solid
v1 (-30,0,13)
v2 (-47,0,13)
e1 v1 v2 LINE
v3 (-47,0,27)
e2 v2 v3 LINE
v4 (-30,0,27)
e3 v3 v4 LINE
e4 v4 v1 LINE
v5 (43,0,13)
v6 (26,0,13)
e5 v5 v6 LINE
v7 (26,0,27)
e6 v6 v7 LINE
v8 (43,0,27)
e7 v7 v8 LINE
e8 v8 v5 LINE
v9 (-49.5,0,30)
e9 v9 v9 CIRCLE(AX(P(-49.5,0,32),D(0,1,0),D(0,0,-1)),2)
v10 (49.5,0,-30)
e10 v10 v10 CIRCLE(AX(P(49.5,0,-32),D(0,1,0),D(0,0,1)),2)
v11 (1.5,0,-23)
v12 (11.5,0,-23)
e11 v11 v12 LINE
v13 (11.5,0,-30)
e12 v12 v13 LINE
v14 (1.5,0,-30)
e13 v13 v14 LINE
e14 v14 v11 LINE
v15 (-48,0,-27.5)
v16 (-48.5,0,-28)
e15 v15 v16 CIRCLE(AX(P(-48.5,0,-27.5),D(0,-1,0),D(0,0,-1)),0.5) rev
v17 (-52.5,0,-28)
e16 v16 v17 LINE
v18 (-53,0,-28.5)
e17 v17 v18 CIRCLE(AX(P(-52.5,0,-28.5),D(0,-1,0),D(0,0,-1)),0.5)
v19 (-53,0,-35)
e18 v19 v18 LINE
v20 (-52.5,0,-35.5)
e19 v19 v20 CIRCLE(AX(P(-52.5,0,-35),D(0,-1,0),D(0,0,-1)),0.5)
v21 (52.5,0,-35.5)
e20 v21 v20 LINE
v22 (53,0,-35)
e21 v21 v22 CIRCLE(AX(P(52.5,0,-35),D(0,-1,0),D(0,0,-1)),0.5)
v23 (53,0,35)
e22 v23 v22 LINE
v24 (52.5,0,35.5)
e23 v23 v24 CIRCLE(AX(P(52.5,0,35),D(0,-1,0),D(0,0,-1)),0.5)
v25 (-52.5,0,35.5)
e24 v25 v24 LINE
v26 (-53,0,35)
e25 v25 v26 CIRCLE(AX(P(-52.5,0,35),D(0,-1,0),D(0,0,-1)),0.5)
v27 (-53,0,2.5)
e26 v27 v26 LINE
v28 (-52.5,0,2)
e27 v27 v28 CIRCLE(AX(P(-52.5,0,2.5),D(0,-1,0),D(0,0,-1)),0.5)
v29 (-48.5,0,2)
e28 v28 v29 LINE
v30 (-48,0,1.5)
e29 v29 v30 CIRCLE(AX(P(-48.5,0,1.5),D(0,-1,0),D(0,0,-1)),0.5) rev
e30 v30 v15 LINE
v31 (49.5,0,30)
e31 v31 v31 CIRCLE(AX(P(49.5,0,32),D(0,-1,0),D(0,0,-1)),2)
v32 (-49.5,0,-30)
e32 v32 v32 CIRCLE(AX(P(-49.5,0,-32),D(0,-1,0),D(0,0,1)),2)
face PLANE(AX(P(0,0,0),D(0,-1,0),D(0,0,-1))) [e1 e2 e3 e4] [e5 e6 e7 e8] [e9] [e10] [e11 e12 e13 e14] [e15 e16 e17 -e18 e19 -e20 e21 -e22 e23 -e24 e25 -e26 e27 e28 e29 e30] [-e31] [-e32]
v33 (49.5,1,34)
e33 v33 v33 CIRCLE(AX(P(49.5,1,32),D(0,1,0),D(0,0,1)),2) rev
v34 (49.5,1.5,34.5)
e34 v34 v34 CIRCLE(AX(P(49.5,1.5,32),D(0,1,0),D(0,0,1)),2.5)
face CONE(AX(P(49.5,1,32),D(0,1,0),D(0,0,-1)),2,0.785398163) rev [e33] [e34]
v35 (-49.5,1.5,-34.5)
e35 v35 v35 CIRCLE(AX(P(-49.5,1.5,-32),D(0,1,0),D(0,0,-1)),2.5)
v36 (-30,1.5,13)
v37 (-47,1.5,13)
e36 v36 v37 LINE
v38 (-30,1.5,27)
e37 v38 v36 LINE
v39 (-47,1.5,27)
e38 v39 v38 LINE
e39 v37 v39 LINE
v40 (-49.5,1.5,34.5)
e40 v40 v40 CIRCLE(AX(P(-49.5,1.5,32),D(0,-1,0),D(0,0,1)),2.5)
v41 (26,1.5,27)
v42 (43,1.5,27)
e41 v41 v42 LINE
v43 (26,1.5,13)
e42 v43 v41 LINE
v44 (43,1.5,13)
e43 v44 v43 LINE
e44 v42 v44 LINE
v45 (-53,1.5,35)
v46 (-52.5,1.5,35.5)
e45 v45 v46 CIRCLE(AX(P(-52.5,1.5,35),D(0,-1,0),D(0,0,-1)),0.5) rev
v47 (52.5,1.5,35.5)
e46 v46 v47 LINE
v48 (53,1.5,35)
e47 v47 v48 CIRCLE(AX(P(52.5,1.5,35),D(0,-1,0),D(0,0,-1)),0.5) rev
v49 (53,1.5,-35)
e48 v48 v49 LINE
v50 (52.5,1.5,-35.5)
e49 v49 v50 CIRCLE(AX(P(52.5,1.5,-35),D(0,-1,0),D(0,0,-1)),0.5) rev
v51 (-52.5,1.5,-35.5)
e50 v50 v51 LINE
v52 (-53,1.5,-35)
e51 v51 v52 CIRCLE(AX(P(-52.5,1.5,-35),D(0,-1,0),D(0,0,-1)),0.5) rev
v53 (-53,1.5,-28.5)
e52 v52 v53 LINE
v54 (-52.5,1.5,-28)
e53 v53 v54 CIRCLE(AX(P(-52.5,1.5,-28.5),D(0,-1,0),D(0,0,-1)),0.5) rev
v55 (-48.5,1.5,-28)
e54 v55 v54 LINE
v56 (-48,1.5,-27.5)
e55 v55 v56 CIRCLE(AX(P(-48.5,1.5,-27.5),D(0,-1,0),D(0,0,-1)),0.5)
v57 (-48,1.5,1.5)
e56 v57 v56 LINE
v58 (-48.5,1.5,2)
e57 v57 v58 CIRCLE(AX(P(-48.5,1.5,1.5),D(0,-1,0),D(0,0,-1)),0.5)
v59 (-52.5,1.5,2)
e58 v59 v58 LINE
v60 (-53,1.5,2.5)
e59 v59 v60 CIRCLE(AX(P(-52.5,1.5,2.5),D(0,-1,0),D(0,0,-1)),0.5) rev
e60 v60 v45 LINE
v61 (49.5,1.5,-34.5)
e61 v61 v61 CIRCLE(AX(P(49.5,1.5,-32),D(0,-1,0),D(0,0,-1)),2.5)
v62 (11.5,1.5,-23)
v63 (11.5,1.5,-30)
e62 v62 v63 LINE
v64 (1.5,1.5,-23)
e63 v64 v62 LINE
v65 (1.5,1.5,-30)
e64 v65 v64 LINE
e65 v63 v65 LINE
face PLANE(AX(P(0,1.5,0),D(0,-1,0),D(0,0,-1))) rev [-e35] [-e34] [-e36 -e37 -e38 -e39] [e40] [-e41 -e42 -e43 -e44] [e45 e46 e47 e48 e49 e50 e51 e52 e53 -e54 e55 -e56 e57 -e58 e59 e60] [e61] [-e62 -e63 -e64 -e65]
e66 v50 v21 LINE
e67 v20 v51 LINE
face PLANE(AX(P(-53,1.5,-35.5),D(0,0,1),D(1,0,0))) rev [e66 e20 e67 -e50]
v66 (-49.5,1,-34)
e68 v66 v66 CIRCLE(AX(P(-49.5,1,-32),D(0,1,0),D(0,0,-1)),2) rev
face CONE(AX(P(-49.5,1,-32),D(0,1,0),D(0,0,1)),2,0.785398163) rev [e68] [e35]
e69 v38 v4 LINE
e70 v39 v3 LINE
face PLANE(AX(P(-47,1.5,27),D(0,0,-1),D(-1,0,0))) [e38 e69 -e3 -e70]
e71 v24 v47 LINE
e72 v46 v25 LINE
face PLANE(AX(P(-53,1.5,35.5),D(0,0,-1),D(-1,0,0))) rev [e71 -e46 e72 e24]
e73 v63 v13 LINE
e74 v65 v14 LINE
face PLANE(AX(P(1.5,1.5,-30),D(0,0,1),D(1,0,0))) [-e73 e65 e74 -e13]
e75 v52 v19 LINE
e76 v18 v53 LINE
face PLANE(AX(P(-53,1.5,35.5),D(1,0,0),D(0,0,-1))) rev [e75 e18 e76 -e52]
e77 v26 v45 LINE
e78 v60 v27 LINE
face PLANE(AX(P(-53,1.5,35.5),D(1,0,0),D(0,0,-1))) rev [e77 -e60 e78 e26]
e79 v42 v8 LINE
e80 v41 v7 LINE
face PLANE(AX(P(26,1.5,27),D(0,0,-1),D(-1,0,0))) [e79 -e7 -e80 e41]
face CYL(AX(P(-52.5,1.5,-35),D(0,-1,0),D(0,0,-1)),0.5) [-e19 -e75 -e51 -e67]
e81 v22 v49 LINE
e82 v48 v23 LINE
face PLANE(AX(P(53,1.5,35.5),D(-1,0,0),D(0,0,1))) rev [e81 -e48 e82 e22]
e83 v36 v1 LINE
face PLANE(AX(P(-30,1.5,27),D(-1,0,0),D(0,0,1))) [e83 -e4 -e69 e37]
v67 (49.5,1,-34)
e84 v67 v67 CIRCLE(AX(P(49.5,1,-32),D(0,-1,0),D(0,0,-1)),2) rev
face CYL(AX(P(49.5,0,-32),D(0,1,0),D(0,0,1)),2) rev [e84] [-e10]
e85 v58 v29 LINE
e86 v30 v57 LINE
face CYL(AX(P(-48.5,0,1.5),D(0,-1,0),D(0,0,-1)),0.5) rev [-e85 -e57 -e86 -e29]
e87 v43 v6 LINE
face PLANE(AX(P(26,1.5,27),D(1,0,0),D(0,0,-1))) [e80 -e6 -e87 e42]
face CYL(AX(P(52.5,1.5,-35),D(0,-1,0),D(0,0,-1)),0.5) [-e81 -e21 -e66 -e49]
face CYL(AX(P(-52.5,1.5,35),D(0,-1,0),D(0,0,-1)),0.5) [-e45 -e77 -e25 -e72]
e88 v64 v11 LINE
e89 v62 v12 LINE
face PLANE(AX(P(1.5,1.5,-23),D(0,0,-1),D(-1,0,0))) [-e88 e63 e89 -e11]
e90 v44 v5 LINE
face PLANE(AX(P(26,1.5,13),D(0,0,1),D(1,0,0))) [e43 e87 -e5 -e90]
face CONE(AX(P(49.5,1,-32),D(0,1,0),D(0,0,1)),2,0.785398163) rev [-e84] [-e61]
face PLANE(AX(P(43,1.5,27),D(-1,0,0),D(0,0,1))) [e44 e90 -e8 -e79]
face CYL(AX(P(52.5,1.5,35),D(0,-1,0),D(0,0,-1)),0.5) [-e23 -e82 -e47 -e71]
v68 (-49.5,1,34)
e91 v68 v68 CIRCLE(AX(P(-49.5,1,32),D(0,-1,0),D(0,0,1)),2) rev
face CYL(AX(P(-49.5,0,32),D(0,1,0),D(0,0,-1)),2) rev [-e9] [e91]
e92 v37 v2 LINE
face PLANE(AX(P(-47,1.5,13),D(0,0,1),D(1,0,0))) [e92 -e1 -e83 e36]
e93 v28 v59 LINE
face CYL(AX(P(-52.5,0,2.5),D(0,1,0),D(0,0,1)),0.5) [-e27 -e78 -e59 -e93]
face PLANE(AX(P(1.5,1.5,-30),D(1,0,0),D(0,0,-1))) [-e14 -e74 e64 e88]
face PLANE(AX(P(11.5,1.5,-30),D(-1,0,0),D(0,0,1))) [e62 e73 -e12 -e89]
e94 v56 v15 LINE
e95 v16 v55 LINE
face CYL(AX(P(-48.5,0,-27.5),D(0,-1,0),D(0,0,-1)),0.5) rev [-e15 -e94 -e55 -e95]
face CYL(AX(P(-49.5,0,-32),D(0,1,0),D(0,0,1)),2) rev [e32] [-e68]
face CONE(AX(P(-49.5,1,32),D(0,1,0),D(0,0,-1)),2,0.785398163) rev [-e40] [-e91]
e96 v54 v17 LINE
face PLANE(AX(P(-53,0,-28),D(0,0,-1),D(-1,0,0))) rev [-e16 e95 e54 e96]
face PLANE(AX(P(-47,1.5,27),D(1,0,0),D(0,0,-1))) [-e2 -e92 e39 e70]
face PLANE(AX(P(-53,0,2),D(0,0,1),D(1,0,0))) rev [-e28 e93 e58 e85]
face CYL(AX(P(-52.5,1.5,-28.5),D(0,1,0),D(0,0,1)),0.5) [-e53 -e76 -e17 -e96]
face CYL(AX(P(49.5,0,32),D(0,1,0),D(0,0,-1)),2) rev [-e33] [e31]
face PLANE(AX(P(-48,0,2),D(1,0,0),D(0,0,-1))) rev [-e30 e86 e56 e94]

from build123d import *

# Parameters (mm, degrees)
SKETCH2_W           = 106
SKETCH2_H           = 71
SKETCH2_W_2         = 17
SKETCH2_H_2         = 14
SKETCH2_W_3         = 10
SKETCH2_H_3         = 7
BOSS_EXTRUDE1_DEPTH = 1.5
SKETCH3_R           = 2
CUT_EXTRUDE1_DEPTH  = 1.5
CHAMFER2_SIZE       = 0.5
SKETCH4_W           = 5
SKETCH4_H           = 30
CUT_EXTRUDE2_DEPTH  = 1.5
FILLET1_R           = 0.5


# Read off the part's stored shape, not the designer's step: Mirror1
with BuildPart() as part:
    # Sketch2 → Boss-Extrude1 (new body)
    with BuildSketch(Plane(origin=(0, 0, 0), x_dir=(1, 0, 0), z_dir=(0, 1, 0))):
        Rectangle(SKETCH2_W, SKETCH2_H)
        with Locations((34.5, -20)):
            Rectangle(SKETCH2_W_2, SKETCH2_H_2, mode=Mode.SUBTRACT)
        with Locations((-38.5, -20)):
            Rectangle(SKETCH2_W_2, SKETCH2_H_2, mode=Mode.SUBTRACT)
        with Locations((6.5, 26.5)):
            Rectangle(SKETCH2_W_3, SKETCH2_H_3, mode=Mode.SUBTRACT)
    extrude(amount=BOSS_EXTRUDE1_DEPTH)

    # Sketch3 → Cut-Extrude1 (cut)
    with BuildSketch(Plane(origin=(0, 1.5, 0), x_dir=(1, 0, 0), z_dir=(0, 1, 0))):
        with Locations(Location((49.5, 32, 0), (0, 0, 270))):
            Circle(SKETCH3_R)
    extrude(amount=-CUT_EXTRUDE1_DEPTH, mode=Mode.SUBTRACT)

    # Chamfer2
    chamfer2_edges = [part.edges().sort_by_distance(p)[0] for p in [
        (49.5, 1.5, -34),
    ]]
    chamfer(chamfer2_edges, length=CHAMFER2_SIZE)

    # Mirror1 outline → Mirror1 (revolve, cut)
    with BuildSketch(Plane(origin=(-49.5, 0, 32), x_dir=(1, 0, 0), z_dir=(0, 0, 1))):
        Polygon((0, 0), (2, 0), (2, 1), (2.5, 1.5), (0, 1.5), align=None)
    revolve(axis=Axis((-49.5, 0, 32), (0, 1, 0)), mode=Mode.SUBTRACT)

    # Mirror1 2 outline → Mirror1 2 (revolve, cut)
    with BuildSketch(Plane(origin=(49.5, 0, 32), x_dir=(1, 0, 0), z_dir=(0, 0, 1))):
        Polygon((0, 0), (2, 0), (2, 1), (2.5, 1.5), (0, 1.5), align=None)
    revolve(axis=Axis((49.5, 0, 32), (0, 1, 0)), mode=Mode.SUBTRACT)

    # Mirror1 3 outline → Mirror1 3 (revolve, cut)
    with BuildSketch(Plane(origin=(-49.5, 0, -32), x_dir=(1, 0, 0), z_dir=(0, 0, 1))):
        Polygon((0, 0), (2, 0), (2, 1), (2.5, 1.5), (0, 1.5), align=None)
    revolve(axis=Axis((-49.5, 0, -32), (0, 1, 0)), mode=Mode.SUBTRACT)

    # Sketch4 → Cut-Extrude2 (cut)
    with BuildSketch(Plane(origin=(0, 1.5, 0), x_dir=(1, 0, 0), z_dir=(0, 1, 0))):
        with Locations((-50.5, 13)):
            Rectangle(SKETCH4_W, SKETCH4_H)
    extrude(amount=-CUT_EXTRUDE2_DEPTH, mode=Mode.SUBTRACT)

    # Fillet1
    fillet1_edges = [part.edges().sort_by_distance(p)[0] for p in [
        (53, 0.75, 35.5),
        (-53, 0.75, 35.5),
        (-53, 0.75, -35.5),
        (53, 0.75, -35.5),
        (-53, 0.75, 2),
        (-53, 0.75, -28),
        (-48, 0.75, -28),
        (-48, 0.75, 2),
    ]]
    fillet(fillet1_edges, radius=FILLET1_R)


solid = part.part
